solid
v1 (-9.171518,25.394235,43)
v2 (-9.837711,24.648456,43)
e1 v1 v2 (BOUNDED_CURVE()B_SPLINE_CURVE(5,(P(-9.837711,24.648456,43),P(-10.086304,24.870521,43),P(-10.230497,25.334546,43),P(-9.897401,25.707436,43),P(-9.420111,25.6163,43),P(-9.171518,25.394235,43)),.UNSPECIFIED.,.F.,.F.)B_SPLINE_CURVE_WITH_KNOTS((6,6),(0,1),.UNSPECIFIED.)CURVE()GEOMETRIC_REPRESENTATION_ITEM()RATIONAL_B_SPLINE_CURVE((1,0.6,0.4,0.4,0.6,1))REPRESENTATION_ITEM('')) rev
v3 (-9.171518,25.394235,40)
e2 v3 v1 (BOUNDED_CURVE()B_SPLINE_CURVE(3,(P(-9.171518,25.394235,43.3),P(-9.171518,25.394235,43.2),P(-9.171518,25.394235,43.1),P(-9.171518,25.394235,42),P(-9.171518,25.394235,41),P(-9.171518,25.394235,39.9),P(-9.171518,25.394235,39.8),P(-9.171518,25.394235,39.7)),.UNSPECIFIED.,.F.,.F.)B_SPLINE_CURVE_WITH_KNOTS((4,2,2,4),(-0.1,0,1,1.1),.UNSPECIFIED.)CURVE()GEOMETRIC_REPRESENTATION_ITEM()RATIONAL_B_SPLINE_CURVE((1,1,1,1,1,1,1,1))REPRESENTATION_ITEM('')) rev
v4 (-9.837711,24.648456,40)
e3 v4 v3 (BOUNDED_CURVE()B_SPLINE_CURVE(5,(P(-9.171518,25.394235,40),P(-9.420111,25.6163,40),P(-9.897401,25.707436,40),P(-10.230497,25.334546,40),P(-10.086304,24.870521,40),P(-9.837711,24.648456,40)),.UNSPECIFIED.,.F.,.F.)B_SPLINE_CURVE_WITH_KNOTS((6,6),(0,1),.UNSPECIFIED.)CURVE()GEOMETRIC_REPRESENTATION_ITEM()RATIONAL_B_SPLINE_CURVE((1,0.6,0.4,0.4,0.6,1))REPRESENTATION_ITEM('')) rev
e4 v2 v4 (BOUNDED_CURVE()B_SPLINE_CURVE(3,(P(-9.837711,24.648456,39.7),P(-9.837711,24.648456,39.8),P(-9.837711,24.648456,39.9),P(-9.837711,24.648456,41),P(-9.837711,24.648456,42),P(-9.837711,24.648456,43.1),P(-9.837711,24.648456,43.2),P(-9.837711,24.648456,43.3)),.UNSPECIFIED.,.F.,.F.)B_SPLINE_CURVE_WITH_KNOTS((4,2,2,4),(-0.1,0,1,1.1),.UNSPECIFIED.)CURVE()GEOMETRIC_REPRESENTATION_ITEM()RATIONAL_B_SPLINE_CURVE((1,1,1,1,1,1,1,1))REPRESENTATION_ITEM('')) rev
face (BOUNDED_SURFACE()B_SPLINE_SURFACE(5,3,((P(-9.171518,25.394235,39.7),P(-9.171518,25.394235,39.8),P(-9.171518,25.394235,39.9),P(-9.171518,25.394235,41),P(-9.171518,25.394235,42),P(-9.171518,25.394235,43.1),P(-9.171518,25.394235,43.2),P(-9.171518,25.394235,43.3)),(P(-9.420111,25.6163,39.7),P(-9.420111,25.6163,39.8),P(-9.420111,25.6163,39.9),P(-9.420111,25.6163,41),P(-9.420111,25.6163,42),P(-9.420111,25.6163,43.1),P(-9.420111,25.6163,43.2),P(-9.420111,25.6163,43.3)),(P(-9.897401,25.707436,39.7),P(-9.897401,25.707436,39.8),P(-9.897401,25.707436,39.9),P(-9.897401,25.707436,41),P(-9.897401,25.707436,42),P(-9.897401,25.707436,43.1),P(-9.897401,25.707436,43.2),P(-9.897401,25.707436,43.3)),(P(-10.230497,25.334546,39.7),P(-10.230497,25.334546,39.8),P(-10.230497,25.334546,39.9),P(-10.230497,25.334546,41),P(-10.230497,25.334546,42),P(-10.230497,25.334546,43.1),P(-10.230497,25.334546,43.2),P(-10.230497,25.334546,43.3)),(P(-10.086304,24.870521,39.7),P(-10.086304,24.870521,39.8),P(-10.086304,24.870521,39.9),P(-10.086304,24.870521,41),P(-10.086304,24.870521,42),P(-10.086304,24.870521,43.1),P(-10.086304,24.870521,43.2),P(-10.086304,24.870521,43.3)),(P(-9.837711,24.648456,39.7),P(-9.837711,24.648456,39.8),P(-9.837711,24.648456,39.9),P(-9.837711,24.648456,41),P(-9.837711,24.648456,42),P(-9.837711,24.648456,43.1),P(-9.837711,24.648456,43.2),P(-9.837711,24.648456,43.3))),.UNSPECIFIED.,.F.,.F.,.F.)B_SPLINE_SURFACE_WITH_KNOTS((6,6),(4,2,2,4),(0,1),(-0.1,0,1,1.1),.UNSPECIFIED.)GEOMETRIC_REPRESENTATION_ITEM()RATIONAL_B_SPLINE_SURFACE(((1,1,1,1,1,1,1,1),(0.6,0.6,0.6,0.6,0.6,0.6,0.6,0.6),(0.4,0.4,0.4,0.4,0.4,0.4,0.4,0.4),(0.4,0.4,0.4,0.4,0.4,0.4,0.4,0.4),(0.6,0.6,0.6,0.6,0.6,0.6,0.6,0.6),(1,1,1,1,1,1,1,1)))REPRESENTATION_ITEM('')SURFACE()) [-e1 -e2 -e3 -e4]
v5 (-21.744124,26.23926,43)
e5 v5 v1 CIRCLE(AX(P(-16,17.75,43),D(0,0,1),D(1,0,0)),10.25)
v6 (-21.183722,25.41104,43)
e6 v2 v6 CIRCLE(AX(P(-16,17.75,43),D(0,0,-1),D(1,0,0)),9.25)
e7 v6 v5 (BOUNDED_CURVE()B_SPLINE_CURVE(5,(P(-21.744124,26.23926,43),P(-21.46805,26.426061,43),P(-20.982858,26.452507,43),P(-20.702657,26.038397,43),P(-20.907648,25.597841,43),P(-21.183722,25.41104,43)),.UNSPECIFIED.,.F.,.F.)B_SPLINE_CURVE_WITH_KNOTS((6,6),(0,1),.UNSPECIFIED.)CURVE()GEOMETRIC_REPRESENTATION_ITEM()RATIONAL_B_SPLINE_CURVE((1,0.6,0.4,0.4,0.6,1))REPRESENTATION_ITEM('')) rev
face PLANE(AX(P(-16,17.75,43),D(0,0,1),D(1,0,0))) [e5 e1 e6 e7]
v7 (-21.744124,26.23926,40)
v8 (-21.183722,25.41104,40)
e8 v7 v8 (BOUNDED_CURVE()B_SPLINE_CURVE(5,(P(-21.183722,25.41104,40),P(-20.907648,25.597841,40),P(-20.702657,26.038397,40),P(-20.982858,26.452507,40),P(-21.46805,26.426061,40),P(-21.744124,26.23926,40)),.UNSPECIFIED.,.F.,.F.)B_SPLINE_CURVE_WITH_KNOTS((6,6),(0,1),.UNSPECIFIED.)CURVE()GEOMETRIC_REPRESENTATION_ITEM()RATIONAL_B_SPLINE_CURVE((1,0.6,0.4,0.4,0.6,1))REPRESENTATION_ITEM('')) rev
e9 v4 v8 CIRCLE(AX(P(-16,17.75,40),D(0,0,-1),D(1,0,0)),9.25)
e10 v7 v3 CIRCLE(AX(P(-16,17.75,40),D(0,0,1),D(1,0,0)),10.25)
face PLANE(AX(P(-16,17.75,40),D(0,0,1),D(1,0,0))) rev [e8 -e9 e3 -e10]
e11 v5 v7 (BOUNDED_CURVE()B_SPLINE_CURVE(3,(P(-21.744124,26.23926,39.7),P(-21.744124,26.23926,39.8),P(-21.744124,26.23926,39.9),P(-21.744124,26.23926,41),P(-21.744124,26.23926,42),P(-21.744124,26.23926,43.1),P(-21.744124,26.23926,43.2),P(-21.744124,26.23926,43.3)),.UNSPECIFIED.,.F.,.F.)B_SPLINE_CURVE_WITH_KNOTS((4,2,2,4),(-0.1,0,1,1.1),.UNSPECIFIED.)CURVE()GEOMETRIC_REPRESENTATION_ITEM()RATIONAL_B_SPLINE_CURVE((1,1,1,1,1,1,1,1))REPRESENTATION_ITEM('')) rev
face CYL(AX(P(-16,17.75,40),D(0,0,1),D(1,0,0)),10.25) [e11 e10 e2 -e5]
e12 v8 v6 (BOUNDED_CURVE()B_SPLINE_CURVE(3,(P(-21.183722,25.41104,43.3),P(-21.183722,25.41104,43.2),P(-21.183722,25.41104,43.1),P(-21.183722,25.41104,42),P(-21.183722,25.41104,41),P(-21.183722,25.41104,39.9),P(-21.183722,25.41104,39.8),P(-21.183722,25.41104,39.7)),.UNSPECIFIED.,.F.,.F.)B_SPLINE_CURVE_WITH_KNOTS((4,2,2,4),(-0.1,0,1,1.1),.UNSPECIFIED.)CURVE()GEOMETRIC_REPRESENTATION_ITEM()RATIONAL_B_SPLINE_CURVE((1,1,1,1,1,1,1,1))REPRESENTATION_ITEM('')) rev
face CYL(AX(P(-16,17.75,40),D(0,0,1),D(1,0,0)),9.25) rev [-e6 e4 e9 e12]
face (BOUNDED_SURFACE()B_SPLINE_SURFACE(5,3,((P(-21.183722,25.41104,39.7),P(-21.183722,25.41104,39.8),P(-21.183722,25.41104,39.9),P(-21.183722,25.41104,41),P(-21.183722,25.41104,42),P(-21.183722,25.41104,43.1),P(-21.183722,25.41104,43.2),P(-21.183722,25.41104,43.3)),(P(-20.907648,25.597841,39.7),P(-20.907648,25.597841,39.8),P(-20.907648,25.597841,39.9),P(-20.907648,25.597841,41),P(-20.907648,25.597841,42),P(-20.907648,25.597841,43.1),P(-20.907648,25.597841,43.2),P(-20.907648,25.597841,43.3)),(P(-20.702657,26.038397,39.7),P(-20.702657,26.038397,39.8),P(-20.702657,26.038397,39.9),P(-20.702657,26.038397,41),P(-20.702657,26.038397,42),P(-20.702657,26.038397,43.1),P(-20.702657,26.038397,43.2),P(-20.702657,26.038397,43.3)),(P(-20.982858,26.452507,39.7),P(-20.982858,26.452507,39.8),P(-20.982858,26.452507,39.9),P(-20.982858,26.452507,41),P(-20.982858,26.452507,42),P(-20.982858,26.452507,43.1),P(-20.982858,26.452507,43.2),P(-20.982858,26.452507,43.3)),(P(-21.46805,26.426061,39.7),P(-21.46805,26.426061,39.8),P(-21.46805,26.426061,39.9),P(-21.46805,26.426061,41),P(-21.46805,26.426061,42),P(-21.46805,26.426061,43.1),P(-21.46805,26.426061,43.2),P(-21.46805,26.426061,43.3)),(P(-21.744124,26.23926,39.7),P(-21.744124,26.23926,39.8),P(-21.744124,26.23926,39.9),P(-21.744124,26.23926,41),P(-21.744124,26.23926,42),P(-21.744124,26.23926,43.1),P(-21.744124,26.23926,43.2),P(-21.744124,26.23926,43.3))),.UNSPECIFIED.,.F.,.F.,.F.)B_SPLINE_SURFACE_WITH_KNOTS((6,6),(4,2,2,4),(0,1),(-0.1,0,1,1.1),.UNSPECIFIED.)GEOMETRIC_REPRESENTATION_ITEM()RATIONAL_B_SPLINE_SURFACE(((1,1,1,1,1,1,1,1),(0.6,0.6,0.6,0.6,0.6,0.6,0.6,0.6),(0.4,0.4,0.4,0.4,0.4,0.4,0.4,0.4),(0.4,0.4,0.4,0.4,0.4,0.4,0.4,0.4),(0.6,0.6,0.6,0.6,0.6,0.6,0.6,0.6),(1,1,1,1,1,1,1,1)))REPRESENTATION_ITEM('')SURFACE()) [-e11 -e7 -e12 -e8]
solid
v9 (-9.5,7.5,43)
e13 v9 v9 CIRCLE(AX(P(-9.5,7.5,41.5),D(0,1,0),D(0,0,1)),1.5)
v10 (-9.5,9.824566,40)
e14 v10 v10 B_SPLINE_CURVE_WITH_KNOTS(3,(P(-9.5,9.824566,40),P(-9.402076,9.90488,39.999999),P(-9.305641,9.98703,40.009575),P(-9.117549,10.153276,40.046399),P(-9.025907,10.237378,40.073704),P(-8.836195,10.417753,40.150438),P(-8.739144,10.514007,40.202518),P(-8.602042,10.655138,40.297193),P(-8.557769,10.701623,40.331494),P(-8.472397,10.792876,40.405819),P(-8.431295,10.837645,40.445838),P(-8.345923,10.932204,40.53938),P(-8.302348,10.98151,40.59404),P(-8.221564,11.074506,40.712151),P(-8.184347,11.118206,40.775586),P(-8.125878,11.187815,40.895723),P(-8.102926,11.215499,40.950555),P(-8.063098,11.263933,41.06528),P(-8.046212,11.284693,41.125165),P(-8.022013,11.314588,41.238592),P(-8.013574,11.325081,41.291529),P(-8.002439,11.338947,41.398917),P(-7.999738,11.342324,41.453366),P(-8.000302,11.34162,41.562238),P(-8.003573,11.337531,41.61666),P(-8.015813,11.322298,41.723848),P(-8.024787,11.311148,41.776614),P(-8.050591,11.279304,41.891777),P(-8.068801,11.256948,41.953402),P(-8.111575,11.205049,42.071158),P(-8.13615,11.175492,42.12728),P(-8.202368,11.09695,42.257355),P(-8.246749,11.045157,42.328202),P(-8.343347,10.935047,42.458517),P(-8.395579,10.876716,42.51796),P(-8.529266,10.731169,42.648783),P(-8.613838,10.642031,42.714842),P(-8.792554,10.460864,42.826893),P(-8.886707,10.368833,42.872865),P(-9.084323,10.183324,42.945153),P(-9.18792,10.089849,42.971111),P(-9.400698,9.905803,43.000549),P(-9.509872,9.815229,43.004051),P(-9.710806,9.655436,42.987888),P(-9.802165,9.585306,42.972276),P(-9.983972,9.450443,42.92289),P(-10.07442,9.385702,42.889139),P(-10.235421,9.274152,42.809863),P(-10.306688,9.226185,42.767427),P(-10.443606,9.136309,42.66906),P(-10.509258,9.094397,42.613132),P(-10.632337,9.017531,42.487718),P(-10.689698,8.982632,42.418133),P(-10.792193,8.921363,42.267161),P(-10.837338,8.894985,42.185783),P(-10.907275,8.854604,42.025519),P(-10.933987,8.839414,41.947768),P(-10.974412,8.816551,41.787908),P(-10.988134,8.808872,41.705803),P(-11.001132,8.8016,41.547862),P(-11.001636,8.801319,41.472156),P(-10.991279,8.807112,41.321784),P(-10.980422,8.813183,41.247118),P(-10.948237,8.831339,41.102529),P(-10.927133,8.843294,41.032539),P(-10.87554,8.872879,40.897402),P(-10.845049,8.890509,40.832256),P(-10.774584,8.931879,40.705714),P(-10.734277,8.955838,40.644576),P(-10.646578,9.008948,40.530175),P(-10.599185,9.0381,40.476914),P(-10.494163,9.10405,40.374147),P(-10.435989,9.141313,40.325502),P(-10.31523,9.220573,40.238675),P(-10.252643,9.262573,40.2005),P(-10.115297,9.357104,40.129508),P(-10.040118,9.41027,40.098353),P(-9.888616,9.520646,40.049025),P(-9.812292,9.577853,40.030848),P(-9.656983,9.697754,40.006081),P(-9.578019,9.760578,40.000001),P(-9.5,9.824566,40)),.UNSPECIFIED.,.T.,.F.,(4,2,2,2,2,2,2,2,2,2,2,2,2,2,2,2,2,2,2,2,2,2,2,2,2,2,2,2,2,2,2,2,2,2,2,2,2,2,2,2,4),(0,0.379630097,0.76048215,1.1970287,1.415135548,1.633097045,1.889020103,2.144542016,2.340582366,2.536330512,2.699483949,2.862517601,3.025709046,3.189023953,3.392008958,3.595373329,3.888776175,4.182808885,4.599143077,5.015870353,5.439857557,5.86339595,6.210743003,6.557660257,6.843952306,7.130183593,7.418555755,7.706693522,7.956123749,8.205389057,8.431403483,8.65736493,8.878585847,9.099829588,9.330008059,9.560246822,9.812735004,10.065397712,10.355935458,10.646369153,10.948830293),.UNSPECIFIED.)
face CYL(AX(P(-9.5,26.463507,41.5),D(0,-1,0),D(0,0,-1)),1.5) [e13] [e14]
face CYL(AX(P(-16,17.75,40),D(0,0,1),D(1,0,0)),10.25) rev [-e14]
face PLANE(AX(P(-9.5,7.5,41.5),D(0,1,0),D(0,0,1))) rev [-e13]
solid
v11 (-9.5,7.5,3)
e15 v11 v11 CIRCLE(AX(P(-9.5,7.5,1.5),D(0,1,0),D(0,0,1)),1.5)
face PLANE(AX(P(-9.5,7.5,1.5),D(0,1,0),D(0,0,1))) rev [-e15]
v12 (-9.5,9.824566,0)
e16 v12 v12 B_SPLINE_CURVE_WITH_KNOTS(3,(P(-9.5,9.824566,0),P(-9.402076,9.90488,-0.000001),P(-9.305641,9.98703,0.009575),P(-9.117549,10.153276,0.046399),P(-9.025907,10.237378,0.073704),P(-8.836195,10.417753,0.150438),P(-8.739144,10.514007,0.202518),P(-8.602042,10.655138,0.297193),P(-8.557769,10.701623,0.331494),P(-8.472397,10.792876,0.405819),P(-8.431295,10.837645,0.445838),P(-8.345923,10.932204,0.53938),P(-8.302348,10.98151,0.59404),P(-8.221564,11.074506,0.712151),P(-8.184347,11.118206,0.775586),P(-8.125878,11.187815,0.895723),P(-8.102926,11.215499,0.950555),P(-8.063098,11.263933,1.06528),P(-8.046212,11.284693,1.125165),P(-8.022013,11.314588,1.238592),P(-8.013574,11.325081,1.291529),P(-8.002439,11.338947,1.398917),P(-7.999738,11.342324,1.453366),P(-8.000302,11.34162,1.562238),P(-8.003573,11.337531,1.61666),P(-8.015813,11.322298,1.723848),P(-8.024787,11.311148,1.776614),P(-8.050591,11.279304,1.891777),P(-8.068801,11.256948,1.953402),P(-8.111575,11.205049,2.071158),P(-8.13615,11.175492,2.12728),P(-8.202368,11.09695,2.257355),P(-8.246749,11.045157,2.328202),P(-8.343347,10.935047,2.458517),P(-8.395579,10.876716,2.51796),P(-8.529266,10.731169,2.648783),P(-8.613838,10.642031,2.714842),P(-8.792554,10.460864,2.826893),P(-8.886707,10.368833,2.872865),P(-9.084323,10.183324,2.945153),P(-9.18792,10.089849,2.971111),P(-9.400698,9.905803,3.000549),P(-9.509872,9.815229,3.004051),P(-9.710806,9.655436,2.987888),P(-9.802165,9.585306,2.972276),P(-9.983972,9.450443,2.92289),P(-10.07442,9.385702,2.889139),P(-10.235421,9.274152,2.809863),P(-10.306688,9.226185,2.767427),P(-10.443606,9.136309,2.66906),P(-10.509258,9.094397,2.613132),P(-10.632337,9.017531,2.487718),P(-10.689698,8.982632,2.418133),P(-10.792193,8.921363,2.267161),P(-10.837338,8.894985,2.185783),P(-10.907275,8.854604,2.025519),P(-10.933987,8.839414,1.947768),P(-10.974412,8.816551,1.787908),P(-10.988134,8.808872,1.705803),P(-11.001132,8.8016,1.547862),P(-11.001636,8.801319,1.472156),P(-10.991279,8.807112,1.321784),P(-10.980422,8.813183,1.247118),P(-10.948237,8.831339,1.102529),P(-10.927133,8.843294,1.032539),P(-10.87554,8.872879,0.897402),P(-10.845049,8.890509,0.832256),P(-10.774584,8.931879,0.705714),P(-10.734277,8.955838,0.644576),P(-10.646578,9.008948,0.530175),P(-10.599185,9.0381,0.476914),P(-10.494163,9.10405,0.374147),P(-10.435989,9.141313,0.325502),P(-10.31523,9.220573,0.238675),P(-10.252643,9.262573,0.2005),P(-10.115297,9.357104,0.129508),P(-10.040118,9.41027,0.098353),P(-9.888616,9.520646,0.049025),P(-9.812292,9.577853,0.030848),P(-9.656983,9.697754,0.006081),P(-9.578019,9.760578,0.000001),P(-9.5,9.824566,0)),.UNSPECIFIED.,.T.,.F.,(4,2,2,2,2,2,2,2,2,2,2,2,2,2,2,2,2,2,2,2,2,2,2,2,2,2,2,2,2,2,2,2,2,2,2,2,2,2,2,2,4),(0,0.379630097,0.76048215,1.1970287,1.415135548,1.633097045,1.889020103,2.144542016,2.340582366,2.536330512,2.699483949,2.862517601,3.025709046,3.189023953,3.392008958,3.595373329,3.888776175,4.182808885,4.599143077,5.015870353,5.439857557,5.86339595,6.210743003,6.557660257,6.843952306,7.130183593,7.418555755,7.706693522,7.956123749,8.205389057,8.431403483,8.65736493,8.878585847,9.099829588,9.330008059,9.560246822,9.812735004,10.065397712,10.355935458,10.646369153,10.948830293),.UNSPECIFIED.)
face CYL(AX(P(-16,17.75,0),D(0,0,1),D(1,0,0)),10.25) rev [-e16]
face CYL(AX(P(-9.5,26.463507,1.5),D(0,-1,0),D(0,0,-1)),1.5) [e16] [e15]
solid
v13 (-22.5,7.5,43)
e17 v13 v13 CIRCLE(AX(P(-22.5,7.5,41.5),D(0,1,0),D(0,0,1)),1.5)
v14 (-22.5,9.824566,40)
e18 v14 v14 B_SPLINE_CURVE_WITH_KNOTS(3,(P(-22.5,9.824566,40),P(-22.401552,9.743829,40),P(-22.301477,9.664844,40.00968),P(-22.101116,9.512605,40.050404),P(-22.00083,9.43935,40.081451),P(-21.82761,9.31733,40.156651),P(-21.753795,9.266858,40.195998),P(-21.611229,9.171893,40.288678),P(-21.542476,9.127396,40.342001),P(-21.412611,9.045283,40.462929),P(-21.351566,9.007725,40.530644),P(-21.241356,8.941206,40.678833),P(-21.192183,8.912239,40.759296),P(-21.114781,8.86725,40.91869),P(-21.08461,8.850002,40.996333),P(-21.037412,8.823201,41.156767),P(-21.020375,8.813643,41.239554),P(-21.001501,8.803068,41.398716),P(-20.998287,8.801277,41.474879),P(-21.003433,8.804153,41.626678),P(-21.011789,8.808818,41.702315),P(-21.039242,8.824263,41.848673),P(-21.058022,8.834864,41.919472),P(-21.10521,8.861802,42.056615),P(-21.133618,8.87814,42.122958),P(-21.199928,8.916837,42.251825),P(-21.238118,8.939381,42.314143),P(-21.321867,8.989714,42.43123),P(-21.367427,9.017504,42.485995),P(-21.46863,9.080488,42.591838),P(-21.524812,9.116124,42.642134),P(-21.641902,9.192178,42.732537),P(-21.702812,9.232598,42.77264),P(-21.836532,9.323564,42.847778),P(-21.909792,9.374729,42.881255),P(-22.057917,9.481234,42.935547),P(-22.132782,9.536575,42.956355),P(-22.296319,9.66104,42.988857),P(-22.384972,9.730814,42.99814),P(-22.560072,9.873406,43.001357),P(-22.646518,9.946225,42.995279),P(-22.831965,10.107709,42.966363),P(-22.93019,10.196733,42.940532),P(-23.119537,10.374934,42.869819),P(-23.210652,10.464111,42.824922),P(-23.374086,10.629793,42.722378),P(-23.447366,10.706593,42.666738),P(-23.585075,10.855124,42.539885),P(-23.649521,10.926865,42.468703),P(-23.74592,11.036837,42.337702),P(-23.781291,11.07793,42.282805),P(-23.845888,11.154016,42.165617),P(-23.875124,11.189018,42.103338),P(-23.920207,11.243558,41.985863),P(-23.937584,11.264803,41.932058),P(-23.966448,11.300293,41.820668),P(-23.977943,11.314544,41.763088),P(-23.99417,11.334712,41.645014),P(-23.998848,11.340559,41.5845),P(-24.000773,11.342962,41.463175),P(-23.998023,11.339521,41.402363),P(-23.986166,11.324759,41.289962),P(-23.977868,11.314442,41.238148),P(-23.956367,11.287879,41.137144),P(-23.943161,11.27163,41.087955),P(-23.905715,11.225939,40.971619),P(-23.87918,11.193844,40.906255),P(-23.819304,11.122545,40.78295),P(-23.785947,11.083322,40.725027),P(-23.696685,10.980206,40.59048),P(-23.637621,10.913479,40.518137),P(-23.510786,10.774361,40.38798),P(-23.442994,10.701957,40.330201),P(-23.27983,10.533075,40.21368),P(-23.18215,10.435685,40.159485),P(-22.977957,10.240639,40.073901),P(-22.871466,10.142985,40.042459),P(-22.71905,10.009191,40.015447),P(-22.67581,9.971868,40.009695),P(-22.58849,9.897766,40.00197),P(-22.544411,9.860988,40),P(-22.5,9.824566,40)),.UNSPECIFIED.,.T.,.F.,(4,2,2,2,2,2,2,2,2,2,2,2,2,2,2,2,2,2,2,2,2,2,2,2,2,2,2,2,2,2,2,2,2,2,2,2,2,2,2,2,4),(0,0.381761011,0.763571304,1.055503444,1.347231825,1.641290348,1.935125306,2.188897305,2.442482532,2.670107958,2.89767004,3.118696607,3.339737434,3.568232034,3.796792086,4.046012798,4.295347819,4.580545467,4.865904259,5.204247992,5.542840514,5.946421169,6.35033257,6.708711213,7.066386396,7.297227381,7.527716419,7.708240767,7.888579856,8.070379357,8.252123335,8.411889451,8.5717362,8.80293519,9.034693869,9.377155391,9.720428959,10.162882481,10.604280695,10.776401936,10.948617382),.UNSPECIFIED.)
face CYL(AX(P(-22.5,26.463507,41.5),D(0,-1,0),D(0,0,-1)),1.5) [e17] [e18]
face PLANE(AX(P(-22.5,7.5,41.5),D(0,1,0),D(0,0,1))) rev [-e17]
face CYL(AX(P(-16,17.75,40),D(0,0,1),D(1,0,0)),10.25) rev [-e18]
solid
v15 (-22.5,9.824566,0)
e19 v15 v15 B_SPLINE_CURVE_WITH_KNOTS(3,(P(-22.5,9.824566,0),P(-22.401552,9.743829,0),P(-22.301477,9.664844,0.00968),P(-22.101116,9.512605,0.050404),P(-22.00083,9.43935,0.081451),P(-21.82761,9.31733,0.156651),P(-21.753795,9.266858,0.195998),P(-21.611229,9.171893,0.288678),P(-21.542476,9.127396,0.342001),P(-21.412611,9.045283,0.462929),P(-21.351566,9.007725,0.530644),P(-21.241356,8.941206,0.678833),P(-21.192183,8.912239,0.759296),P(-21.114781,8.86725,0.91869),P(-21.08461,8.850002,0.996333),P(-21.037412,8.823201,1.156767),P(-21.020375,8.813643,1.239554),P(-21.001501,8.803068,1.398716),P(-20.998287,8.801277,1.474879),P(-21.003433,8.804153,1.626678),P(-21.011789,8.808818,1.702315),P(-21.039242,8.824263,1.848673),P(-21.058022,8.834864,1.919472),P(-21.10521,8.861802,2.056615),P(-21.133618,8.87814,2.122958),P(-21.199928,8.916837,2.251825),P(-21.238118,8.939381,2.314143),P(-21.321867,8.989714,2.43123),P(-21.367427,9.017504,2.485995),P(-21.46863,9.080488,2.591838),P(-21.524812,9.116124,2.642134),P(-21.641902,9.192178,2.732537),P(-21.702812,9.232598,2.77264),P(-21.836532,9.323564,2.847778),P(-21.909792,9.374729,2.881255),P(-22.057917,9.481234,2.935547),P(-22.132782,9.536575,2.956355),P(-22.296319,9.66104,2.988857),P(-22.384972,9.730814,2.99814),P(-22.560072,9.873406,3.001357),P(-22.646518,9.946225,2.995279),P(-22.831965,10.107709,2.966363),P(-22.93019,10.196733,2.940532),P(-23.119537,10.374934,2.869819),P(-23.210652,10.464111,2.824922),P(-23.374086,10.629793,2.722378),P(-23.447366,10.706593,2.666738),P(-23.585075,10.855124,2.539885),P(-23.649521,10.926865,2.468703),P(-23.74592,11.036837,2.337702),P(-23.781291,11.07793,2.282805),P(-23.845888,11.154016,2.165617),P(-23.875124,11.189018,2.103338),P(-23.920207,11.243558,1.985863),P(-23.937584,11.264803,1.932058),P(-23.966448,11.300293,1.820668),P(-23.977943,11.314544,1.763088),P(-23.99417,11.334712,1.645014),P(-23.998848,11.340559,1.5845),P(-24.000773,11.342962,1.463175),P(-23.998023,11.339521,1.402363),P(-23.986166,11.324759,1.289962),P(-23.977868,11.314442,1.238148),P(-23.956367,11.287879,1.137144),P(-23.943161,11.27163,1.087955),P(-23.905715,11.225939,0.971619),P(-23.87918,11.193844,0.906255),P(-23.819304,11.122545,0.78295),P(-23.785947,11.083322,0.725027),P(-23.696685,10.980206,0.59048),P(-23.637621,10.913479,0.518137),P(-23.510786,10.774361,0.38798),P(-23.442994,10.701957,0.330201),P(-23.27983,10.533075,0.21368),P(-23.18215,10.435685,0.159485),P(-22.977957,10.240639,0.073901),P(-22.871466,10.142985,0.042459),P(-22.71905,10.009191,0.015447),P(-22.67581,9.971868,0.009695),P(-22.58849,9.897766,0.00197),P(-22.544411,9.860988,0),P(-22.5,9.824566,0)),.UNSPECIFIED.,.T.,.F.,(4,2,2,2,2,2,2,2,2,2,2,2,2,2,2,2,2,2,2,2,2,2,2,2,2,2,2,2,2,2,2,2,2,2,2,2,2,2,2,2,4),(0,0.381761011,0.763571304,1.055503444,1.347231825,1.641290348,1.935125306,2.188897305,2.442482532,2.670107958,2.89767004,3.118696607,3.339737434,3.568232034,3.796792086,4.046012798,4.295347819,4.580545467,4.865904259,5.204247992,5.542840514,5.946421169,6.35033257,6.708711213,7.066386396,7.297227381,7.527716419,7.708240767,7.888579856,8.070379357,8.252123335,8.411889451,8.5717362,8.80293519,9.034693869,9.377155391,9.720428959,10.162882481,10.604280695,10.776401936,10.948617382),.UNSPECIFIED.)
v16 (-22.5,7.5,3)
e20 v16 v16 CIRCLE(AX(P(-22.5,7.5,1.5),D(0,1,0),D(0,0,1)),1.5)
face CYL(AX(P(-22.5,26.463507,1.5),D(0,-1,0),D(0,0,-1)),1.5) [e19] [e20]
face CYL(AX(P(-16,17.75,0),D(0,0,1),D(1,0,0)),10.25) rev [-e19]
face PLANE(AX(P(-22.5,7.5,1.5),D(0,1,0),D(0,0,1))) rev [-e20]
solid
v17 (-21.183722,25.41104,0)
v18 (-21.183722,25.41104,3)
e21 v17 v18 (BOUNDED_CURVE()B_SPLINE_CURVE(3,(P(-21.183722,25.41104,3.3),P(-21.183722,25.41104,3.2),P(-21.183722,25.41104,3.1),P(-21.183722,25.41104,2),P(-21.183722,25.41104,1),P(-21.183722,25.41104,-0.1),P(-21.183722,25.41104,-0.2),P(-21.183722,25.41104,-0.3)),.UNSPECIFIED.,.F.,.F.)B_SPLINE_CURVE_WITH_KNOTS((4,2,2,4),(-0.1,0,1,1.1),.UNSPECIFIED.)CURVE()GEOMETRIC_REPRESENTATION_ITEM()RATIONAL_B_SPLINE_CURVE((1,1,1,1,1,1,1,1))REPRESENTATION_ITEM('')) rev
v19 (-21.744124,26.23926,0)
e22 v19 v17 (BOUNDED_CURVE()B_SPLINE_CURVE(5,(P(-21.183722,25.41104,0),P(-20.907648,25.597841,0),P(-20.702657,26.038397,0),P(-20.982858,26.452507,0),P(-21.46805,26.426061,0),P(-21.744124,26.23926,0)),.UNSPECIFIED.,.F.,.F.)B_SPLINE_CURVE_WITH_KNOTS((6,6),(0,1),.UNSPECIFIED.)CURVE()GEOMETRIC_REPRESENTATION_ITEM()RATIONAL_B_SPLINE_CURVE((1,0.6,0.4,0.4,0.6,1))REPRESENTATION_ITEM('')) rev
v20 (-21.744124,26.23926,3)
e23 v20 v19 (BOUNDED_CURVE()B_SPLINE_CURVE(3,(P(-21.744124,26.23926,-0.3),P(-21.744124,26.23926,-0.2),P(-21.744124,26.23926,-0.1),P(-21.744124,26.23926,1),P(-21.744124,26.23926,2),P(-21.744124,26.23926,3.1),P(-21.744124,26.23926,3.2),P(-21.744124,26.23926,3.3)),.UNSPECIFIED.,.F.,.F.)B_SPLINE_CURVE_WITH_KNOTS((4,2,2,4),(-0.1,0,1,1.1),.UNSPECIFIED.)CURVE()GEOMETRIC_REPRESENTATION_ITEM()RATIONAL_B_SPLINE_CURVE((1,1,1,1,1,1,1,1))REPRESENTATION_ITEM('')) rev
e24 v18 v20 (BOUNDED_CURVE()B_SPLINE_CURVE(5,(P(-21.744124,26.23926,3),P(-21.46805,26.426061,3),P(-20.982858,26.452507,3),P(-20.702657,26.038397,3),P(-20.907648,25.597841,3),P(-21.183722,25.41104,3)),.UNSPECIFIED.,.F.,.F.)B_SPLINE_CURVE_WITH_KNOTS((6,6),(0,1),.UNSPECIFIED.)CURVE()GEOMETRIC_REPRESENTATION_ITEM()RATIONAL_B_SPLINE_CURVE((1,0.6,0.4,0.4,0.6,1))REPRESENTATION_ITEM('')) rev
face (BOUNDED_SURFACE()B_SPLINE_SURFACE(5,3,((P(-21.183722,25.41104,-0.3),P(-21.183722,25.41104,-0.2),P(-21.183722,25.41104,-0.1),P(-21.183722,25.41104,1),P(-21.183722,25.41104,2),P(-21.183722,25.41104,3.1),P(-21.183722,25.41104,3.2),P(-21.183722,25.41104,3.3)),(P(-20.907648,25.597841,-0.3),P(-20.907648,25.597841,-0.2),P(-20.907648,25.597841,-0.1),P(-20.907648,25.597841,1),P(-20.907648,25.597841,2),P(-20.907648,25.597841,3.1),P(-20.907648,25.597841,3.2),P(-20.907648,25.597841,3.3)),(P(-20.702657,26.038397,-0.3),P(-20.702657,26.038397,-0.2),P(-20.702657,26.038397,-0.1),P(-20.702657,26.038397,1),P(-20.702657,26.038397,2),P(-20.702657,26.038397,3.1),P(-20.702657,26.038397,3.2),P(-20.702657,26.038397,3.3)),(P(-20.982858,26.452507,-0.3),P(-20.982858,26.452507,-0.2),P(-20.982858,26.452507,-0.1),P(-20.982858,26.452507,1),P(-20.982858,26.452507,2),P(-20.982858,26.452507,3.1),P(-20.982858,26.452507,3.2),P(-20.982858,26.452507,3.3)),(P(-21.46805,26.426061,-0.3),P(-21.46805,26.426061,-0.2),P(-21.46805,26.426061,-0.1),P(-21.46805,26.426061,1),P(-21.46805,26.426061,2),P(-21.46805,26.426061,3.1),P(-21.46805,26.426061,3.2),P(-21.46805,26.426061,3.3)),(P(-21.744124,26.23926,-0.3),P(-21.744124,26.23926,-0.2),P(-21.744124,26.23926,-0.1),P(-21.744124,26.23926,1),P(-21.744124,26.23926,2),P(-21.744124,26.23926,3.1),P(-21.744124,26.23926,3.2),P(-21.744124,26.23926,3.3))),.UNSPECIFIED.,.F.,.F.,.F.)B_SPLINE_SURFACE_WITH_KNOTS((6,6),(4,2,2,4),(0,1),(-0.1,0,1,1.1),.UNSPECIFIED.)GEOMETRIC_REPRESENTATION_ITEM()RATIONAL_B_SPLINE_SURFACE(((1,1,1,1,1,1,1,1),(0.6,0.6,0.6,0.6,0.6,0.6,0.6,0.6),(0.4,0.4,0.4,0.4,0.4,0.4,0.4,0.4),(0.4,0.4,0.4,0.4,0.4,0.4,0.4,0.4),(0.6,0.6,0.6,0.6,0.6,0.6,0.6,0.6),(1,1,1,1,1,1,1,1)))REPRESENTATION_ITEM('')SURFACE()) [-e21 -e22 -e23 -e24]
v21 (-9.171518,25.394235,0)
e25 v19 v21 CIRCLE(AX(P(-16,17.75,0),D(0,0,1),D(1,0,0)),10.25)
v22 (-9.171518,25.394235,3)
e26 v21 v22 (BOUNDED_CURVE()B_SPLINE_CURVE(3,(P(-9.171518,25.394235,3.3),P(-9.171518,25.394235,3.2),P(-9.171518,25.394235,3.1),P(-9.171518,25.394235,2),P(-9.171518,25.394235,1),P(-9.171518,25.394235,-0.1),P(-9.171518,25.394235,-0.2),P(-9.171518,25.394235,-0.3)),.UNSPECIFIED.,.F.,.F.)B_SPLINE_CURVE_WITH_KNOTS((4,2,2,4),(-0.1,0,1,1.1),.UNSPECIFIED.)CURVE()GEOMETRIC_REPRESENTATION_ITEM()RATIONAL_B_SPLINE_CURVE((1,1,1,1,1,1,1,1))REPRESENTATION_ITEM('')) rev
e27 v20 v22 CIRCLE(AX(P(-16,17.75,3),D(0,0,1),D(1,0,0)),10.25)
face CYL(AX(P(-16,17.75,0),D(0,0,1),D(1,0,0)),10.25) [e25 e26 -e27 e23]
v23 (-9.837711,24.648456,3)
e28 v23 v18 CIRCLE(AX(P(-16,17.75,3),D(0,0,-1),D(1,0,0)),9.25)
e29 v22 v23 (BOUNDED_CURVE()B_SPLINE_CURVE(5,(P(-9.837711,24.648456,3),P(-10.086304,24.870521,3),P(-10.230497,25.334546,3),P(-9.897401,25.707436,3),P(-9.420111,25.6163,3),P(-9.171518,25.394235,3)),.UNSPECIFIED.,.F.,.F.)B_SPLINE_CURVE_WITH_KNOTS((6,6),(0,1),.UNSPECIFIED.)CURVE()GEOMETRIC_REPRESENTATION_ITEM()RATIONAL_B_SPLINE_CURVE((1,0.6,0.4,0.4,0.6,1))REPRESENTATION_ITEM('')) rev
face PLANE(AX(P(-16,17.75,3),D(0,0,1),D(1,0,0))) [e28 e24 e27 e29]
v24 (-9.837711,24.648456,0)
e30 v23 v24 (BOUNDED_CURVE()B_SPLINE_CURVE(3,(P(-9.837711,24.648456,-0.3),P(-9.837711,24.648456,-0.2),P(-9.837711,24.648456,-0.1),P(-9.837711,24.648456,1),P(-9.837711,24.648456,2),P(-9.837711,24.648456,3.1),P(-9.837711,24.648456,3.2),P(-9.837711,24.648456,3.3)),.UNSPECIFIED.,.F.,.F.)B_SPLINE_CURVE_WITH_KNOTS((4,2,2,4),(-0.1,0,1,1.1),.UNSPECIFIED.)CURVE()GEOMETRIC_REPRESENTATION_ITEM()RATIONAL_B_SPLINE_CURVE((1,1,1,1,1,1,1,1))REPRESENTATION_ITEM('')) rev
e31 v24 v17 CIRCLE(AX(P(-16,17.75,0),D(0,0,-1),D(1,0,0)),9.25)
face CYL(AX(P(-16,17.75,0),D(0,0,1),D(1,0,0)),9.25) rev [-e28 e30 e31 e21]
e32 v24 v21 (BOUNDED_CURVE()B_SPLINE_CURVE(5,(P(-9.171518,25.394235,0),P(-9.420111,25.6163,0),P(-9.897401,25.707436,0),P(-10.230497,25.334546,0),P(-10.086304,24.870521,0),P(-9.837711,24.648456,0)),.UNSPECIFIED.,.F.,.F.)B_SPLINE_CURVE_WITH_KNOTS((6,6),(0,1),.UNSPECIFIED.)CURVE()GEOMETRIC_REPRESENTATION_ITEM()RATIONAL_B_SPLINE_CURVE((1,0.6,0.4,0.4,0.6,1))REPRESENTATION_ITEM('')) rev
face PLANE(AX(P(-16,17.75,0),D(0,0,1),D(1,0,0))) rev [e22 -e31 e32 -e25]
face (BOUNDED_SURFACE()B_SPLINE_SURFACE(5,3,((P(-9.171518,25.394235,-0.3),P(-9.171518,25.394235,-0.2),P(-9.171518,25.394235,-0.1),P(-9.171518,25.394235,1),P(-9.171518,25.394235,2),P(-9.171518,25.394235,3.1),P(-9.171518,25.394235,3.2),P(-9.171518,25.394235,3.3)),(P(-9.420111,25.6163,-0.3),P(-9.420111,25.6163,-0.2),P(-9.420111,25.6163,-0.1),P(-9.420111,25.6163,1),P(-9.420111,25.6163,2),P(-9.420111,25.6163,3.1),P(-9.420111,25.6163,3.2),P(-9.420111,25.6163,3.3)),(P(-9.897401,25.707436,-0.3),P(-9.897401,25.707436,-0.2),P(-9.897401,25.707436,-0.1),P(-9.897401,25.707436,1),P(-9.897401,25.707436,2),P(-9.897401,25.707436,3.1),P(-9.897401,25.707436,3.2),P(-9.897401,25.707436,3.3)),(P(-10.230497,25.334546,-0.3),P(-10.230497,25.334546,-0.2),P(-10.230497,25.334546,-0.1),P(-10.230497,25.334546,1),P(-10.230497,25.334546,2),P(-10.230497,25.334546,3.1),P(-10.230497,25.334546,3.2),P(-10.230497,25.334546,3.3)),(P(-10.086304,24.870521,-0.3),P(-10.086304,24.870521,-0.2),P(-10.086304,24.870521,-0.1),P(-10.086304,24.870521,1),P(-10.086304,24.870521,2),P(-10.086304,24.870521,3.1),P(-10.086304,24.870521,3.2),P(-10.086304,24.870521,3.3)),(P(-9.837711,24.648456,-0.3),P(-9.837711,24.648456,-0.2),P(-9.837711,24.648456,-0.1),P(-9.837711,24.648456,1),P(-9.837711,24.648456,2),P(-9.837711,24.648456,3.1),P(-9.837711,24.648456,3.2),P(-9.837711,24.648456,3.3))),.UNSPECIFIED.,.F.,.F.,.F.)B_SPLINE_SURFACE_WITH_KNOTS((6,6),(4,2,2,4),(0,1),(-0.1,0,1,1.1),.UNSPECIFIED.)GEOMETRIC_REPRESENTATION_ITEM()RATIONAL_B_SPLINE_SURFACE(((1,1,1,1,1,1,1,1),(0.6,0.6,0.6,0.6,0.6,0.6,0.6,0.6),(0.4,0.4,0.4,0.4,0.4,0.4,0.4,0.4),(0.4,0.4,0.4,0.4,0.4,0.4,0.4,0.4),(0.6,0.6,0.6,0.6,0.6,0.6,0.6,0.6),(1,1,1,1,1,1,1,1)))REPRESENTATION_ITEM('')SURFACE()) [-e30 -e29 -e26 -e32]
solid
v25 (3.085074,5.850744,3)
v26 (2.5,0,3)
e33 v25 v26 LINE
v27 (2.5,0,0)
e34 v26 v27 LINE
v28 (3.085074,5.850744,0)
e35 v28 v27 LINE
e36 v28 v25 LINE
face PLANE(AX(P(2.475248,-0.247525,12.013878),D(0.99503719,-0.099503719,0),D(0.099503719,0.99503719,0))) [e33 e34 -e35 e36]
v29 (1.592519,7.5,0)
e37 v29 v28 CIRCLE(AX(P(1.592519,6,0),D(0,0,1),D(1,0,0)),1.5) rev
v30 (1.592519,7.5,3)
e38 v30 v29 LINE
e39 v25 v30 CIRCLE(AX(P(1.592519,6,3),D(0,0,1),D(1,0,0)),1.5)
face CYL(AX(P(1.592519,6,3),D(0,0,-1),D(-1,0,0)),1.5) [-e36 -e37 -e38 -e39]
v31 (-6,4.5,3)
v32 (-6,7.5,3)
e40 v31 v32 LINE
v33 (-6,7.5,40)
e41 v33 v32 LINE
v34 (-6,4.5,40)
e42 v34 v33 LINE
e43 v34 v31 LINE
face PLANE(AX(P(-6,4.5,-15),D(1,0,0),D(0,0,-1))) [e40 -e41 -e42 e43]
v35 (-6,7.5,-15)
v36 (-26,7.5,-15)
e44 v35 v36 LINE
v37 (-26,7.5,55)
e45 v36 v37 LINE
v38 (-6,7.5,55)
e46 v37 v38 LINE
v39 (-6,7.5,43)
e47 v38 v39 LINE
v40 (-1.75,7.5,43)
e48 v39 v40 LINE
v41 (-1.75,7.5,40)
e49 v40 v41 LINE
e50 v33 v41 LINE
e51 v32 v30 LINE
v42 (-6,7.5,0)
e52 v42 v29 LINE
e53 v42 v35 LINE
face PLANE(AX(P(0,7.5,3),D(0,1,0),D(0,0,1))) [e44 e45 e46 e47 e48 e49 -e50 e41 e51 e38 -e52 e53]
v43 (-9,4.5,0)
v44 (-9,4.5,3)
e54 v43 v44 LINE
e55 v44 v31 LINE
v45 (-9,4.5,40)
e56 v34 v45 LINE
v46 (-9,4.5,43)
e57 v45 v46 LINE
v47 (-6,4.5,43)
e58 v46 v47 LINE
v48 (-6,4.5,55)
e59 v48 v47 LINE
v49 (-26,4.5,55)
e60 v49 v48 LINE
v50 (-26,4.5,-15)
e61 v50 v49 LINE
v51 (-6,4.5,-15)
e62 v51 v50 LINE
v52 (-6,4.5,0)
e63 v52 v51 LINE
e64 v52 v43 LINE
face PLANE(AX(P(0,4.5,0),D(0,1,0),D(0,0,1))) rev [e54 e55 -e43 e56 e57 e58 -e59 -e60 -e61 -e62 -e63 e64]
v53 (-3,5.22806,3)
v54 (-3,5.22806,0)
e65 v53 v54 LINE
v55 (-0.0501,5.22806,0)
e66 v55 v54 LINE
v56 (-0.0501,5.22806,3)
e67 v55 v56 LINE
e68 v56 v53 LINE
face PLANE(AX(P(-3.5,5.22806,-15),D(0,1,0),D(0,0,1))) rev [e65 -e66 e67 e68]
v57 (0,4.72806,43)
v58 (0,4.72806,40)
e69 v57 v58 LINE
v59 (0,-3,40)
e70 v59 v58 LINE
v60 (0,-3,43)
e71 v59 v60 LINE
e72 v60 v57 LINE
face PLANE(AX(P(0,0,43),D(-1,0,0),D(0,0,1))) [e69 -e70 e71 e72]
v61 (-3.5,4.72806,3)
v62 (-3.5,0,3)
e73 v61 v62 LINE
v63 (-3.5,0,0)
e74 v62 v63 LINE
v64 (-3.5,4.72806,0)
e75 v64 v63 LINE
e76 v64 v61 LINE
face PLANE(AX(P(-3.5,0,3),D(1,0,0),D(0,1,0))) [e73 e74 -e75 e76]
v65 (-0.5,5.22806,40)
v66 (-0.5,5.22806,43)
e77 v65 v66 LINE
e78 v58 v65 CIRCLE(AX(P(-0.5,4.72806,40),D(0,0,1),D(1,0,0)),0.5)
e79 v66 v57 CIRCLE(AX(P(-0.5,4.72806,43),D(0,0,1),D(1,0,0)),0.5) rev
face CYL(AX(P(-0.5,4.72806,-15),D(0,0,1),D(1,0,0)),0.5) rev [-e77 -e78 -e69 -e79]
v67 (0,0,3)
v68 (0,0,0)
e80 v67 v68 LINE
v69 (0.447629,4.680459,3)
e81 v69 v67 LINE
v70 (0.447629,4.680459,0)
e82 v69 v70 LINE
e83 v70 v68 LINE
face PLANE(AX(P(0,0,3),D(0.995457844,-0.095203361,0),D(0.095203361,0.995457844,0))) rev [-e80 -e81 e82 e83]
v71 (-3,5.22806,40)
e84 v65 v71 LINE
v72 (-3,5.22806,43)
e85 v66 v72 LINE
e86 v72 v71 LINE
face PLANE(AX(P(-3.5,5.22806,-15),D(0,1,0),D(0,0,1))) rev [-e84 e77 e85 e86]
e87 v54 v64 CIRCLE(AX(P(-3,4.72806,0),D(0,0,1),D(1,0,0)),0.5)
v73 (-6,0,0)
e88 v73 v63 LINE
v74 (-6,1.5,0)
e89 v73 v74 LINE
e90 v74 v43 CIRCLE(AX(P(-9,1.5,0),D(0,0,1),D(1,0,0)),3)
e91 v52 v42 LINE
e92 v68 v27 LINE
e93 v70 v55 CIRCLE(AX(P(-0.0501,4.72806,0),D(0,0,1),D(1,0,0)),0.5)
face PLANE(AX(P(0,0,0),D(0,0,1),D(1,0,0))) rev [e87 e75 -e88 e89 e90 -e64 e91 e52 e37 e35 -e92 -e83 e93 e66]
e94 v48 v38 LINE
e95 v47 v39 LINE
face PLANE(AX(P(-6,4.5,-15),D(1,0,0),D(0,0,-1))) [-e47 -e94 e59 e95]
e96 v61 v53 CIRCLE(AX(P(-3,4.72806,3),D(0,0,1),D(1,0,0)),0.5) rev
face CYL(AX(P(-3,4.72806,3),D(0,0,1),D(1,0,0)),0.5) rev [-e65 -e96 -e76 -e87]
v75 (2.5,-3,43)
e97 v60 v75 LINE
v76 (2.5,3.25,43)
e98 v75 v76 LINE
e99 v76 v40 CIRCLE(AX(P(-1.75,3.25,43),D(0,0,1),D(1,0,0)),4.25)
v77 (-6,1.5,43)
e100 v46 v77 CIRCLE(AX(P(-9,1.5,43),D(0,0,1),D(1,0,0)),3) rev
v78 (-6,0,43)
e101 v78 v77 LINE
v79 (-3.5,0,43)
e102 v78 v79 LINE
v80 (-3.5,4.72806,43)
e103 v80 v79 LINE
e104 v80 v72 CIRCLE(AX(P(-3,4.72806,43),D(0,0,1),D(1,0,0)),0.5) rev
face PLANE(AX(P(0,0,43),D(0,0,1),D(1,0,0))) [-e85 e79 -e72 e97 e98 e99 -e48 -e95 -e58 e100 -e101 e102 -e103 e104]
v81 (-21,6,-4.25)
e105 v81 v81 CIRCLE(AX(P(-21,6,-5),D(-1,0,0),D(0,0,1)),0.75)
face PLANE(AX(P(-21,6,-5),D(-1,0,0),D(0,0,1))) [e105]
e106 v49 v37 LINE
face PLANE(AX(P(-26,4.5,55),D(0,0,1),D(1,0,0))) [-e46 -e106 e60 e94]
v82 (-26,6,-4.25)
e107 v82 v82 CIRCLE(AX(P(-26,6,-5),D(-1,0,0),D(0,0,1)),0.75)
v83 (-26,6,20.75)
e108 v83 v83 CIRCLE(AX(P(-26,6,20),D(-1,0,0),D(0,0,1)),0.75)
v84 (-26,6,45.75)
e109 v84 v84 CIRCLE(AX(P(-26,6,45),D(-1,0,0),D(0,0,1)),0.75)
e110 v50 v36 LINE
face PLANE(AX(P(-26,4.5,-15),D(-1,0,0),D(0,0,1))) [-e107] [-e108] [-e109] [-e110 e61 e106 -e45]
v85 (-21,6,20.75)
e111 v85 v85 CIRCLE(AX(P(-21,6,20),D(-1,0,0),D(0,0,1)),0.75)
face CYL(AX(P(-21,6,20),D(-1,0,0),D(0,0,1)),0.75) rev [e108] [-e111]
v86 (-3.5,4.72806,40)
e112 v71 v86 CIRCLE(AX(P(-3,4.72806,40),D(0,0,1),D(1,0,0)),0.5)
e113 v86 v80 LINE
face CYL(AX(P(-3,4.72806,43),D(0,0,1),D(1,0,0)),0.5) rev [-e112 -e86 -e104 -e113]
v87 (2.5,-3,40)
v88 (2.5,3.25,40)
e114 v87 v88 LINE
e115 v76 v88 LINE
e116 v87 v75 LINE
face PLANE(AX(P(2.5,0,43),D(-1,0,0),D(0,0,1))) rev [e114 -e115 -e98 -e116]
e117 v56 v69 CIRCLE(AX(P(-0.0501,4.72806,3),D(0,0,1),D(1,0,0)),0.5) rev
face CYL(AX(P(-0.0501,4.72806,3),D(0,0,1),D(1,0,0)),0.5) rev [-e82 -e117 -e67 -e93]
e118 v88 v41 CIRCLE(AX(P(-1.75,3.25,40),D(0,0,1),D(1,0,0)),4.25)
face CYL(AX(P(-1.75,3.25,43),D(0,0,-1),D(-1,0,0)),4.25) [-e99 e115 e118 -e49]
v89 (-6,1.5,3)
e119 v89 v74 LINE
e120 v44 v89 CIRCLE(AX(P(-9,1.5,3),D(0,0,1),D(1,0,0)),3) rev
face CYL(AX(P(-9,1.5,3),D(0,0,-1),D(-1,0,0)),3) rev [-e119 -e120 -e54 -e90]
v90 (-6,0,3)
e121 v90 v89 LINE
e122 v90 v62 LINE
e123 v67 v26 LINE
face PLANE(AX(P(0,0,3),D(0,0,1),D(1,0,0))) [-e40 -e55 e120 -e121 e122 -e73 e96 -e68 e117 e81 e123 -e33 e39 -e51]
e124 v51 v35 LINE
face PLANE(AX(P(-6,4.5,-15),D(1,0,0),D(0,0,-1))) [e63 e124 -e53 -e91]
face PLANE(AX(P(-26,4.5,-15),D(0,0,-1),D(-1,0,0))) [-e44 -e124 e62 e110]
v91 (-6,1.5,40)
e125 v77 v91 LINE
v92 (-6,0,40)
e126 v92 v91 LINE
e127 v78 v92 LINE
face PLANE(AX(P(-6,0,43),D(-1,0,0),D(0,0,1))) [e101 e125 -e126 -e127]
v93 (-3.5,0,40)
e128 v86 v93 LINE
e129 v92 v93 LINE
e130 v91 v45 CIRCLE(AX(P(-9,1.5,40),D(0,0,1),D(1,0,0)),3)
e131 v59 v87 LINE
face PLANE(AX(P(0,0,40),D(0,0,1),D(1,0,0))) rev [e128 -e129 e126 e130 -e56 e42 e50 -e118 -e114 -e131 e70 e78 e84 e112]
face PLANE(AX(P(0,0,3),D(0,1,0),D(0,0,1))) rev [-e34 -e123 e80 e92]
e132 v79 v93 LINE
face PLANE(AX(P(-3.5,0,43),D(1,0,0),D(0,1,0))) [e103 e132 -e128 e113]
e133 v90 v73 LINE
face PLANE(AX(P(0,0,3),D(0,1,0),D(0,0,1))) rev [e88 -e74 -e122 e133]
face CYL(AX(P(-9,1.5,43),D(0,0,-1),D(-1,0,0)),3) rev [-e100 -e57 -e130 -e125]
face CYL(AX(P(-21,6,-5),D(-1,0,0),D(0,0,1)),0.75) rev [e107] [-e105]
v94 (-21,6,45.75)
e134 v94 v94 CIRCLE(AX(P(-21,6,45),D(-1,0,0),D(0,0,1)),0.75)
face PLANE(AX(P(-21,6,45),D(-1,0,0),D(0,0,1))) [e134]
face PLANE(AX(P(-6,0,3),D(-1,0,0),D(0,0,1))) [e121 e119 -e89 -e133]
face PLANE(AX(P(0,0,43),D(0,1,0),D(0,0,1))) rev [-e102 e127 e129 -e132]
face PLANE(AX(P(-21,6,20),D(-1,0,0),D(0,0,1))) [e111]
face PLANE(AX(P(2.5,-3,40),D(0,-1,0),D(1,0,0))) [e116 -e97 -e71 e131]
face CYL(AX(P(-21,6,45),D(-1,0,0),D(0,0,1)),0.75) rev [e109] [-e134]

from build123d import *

# Parameters (mm, degrees)
BOSS_EXTRUDE1_DEPTH      = 3
LPATTERN1_COUNT          = 2
LPATTERN1_PITCH          = 40
SKETCH2_W                = 20
SKETCH2_H                = 70
BOSS_EXTRUDE2_DEPTH      = 3
FILLET1_R                = 3
BOSS_EXTRUDE3_DEPTH      = 3
FILLET2_START            = -1
FILLET2_DEPTH            = 5
FILLET3_DEPTH            = 3
BOSS_EXTRUDE5_REACH      = 65.784
BOSS_EXTRUDE5_END_RADIUS = 10.25
SKETCH5_R                = 1.5
LPATTERN2_START          = 40
LPATTERN2_DEPTH          = 3
LPATTERN2_START_2        = 7.5
LPATTERN2_2_OUTLINE_R    = 1.5
LPATTERN2_2_DEPTH        = 1.302234895
LPATTERN2_START_3        = 8.802234895
LPATTERN2_3_OUTLINE_R    = 1.5
LPATTERN2_3_DEPTH        = 2.539759791
LPATTERN2_START_4        = 39
LPATTERN2_4_DEPTH        = 5
LPATTERN2_5_OUTLINE_R    = 1.5
LPATTERN2_5_DEPTH        = 1.302235223
LPATTERN2_START_5        = 8.802235223
LPATTERN2_6_OUTLINE_R    = 1.5
LPATTERN2_6_DEPTH        = 2.539761855
LPATTERN2_7_OUTLINE_W    = 10.25
LPATTERN2_7_OUTLINE_H    = 3.000220265
LPATTERN2_7_ANGLE        = 22.115218
CUT_EXTRUDE2_DEPTH       = 64.922422006
CUT_EXTRUDE2_DEPTH_BACK  = 64.922422006
SKETCH6_W                = 3.5
SKETCH6_H                = 1.978060381
FILLET4_R                = 0.5
SKETCH7_W                = 2.5
SKETCH7_H                = 3
BOSS_EXTRUDE6_DEPTH      = 3
SKETCH8_R                = 0.75
CUT_EXTRUDE3_DEPTH       = 5
CUT_EXTRUDE4_START       = -3
CUT_EXTRUDE4_DEPTH       = 3
BOSS_EXTRUDE7_DEPTH      = 3
FILLET5_R                = 0.5
FILLET6_R                = 1.5


with BuildPart() as part:
    # Sketch1 → Boss-Extrude1 (new body)
    with BuildSketch(Plane.XY):
        with BuildLine():
            Line((0, 3.25), (0, 0))
            Line((0, 0), (2.5, 0))
            Line((2.5, 0), (2.5, 3.25))
            ThreePointArc((2.5, 3.25), (1.25520382, 6.25520382), (-1.75, 7.5))
            Line((-1.75, 7.5), (-6, 7.5))
            Line((-6, 7.5), (-6, 3.25))
            Line((-6, 3.25), (-6, 0))
            Line((-6, 0), (-3.5, 0))
            Line((-3.5, 0), (-3.5, 3.25))
            ThreePointArc((-3.5, 3.25), (-1.75, 5), (0, 3.25))
        make_face()
    extrude(amount=BOSS_EXTRUDE1_DEPTH)


with BuildPart() as lpattern1_1:
    # LPattern1: pattern copy
    add(part.part.moved(Location(Vector(0, 0, 1) * (1 * LPATTERN1_PITCH))))


with BuildPart() as part_1:
    add(part.part)

    add(lpattern1_1.part)  # Boss-Extrude2 merges LPattern1_1
    # Sketch2 → Boss-Extrude2 (add)
    with BuildSketch(Plane(origin=(0, 7.5, 0), x_dir=(1, 0, 0), z_dir=(0, 1, 0))):
        with Locations((-16, -20)):
            Rectangle(SKETCH2_W, SKETCH2_H)
    extrude(amount=-BOSS_EXTRUDE2_DEPTH)

    # Fillet1
    fillet1_edges = [part_1.edges().sort_by_distance(p)[0] for p in [
        (-6, 4.5, 1.5),
        (-6, 4.5, 41.5),
    ]]
    fillet(fillet1_edges, radius=FILLET1_R)

    # Sketch6 → Cut-Extrude2 (cut, two sides: drawn at the far end of the back side and taken through both)
    with BuildSketch(Plane.XY.offset(3).offset(-CUT_EXTRUDE2_DEPTH_BACK)):
        with Locations((-1.75, 4.239030191)):
            Rectangle(SKETCH6_W, SKETCH6_H)
    extrude(amount=CUT_EXTRUDE2_DEPTH + CUT_EXTRUDE2_DEPTH_BACK, mode=Mode.SUBTRACT)

    # Fillet4
    fillet4_edges = [part_1.edges().sort_by_distance(p)[0] for p in [
        (-3.5, 5.228060381, 1.5),
        (-3.5, 5.228060381, 41.5),
        (0, 5.228060381, 1.5),
        (0, 5.228060381, 41.5),
    ]]
    fillet(fillet4_edges, radius=FILLET4_R)

    # Sketch7 → Boss-Extrude6 (add)
    with BuildSketch(Plane.XY.offset(43)):
        with Locations((1.25, -1.5)):
            Rectangle(SKETCH7_W, SKETCH7_H)
    extrude(amount=-BOSS_EXTRUDE6_DEPTH)

    # Sketch8 → Cut-Extrude3 (cut)
    with BuildSketch(Plane.ZY.offset(26)):
        with Locations((-5, 6)):
            Circle(SKETCH8_R)
        with Locations((20, 6)):
            Circle(SKETCH8_R)
        with Locations((45, 6)):
            Circle(SKETCH8_R)
    extrude(amount=-CUT_EXTRUDE3_DEPTH, mode=Mode.SUBTRACT)

    # Sketch9 → Cut-Extrude4 (cut)
    with BuildSketch(Plane(origin=(0, 0, 0), x_dir=(-1, 0, 0), z_dir=(0, 0, -1)).offset(CUT_EXTRUDE4_START)):
        with BuildLine():
            Line((0, 0), (0.5, 5.228060381))
            ThreePointArc((0.5, 5.228060381), (0.146446609, 5.081613772), (0, 4.728060381))
            Line((0, 4.728060381), (0, 0))
        make_face()
        with BuildLine():
            Line((0.5, 5.228060381), (-0.5, 5.228060381))
            Line((-0.5, 5.228060381), (0, 0))
            Line((0, 0), (0, 4.728060381))
            ThreePointArc((0, 4.728060381), (0.146446609, 5.081613772), (0.5, 5.228060381))
        make_face()
    extrude(amount=CUT_EXTRUDE4_DEPTH, mode=Mode.SUBTRACT)

    # Sketch9<3> → Boss-Extrude7 (add)
    with BuildSketch(Plane(origin=(0, 0, 0), x_dir=(-1, 0, 0), z_dir=(0, 0, -1))):
        with BuildLine():
            Line((1.75, 7.5), (-3.25, 7.5))
            Line((-3.25, 7.5), (-2.5, 0))
            Line((-2.5, 0), (-2.5, 3.25))
            ThreePointArc((-2.5, 3.25), (-1.25520382, 6.25520382), (1.75, 7.5))
        make_face()
    extrude(amount=-BOSS_EXTRUDE7_DEPTH)

    # Fillet5
    fillet5_edges = [part_1.edges().sort_by_distance(p)[0] for p in [
        (0.5, 5.228060381, 1.5),
    ]]
    fillet(fillet5_edges, radius=FILLET5_R)

    # Fillet6
    fillet6_edges = [part_1.edges().sort_by_distance(p)[0] for p in [
        (3.25, 7.5, 1.5),
    ]]
    fillet(fillet6_edges, radius=FILLET6_R)


with BuildPart() as body_2:
    # Sketch4 → Boss-Extrude3 (new body)
    with BuildSketch(Plane.XY.offset(3)):
        with BuildLine():
            Line((-20.857798696, 25.621740076), (-21.206324936, 26.579308051))
            ThreePointArc((-21.206324936, 26.579308051), (-16.672163531, 7.522062955), (-9.682947675, 25.822010278))
            Line((-9.682947675, 25.822010278), (-10.11803023, 24.888972729))
            ThreePointArc((-10.11803023, 24.888972729), (-16.629657521, 8.521455618), (-20.857798696, 25.621740076))
        make_face()
    extrude(amount=-BOSS_EXTRUDE3_DEPTH)

    # Fillet2: read off the stored shape, not the designer's step
    # Fillet2 outline → Fillet2 (cut)
    with BuildSketch(Plane.XY.offset(FILLET2_START)):
        with BuildLine():
            add(Edge.make_bspline(
                [(-20.994076432, 25.996160077), (-21.074153595, 26.216170321), (-21.251523965, 26.350710286), (-21.454646821, 26.373043505), (-21.624101617, 26.320471493), (-21.744123922, 26.239260296)],
                knots=[0.438237279, 0.438237279, 0.438237279, 0.438237279, 0.438237279, 0.438237279, 1, 1, 1, 1, 1, 1], degree=5, weights=[0.507629267, 0.479872472, 0.515231147, 0.613705294, 0.775294911, 1]))
            Line((-20.994076432, 25.996160077), (-21.206324936, 26.579308051))
            ThreePointArc((-21.206324936, 26.579308051), (-21.477863695, 26.413458278), (-21.744123922, 26.239260296))
        make_face()
        with BuildLine():
            add(Edge.make_bspline(
                [(-21.183721588, 25.411039779), (-21.095700521, 25.470597844), (-21.011417818, 25.561339411), (-20.949957611, 25.687250869), (-20.937439038, 25.840550084), (-20.994076432, 25.996160077)],
                knots=[0, 0, 0, 0, 0, 0, 0.438237279, 0.438237279, 0.438237279, 0.438237279, 0.438237279, 0.438237279], degree=5, weights=[1, 0.824705088, 0.687820559, 0.589346413, 0.529282649, 0.507629267]))
            ThreePointArc((-21.183721588, 25.411039779), (-21.021865296, 25.518099442), (-20.857798696, 25.621740076))
            Line((-20.857798696, 25.621740076), (-20.994076432, 25.996160077))
        make_face()
    extrude(amount=FILLET2_DEPTH, mode=Mode.SUBTRACT)

    # Fillet3: read off the stored shape, not the designer's step
    # Fillet3 outline → Fillet3 (cut)
    with BuildSketch(Plane.XY):
        with BuildLine():
            add(Edge.make_bspline(
                [(-9.171518011, 25.394235327), (-9.282578146, 25.493443697), (-9.44922289, 25.569577268), (-9.660410728, 25.570842005), (-9.856114015, 25.450653826), (-9.957768573, 25.23265496)],
                knots=[0, 0, 0, 0, 0, 0, 0.573717386, 0.573717386, 0.573717386, 0.573717386, 0.573717386, 0.573717386], degree=5, weights=[1, 0.770513046, 0.606856419, 0.50903012, 0.477034149, 0.510868506]))
            ThreePointArc((-9.171518011, 25.394235327), (-9.423753658, 25.612282369), (-9.682947675, 25.822010278))
            Line((-9.682947675, 25.822010278), (-9.957768573, 25.23265496))
        make_face()
        with BuildLine():
            add(Edge.make_bspline(
                [(-9.957768573, 25.23265496), (-10.024989519, 25.088499201), (-10.028130695, 24.940896848), (-9.983698166, 24.813907164), (-9.914364214, 24.716929113), (-9.837711376, 24.648456271)],
                knots=[0.573717386, 0.573717386, 0.573717386, 0.573717386, 0.573717386, 0.573717386, 1, 1, 1, 1, 1, 1], degree=5, weights=[0.510868506, 0.536008058, 0.597490983, 0.695317282, 0.829486954, 1]))
            Line((-9.957768573, 25.23265496), (-10.11803023, 24.888972729))
            ThreePointArc((-10.11803023, 24.888972729), (-9.976670181, 24.770113809), (-9.837711376, 24.648456271))
        make_face()
    extrude(amount=FILLET3_DEPTH, mode=Mode.SUBTRACT)


with BuildPart() as body_3:
    # Boss-Extrude5: up to this cylinder (the profile starts outside it)
    boss_extrude5_end = Plane(origin=(-16, 17.75, 1.5), z_dir=(0, 0, 1)) * Cylinder(BOSS_EXTRUDE5_END_RADIUS, 153.068, mode=Mode.PRIVATE)
    # Sketch5 → Boss-Extrude5 (new, up to the surface)
    with BuildSketch(Plane(origin=(0, 7.5, 0), x_dir=(1, 0, 0), z_dir=(0, 1, 0)), mode=Mode.PRIVATE) as boss_extrude5_sk1:
        with Locations(Location((-22.5, -1.5, 0), (0, 0, 90))):
            Circle(SKETCH5_R)
    boss_extrude5_tool1 = extrude(boss_extrude5_sk1.sketch, amount=BOSS_EXTRUDE5_REACH, mode=Mode.PRIVATE) - boss_extrude5_end
    add(boss_extrude5_tool1.solids().sort_by_distance((-22.5, 7.5, 1.5))[0])
    # Sketch5 → Boss-Extrude5 (new, up to the surface)
    with BuildSketch(Plane(origin=(0, 7.5, 0), x_dir=(1, 0, 0), z_dir=(0, 1, 0)), mode=Mode.PRIVATE) as boss_extrude5_sk2:
        with Locations(Location((-9.5, -1.5, 0), (0, 0, 90))):
            Circle(SKETCH5_R)
    boss_extrude5_tool2 = extrude(boss_extrude5_sk2.sketch, amount=BOSS_EXTRUDE5_REACH, mode=Mode.PRIVATE) - boss_extrude5_end
    add(boss_extrude5_tool2.solids().sort_by_distance((-9.5, 7.5, 1.5))[0])


with BuildPart() as body_4:
    # LPattern2: read off the stored shape, not the designer's step
    # LPattern2 outline → LPattern2 (new body)
    with BuildSketch(Plane.XY.offset(LPATTERN2_START)):
        with BuildLine():
            ThreePointArc((-21.744123922, 26.239260296), (-16.687368099, 7.523073526), (-9.171518011, 25.394235327))
            add(Edge.make_bspline(
                [(-9.171518011, 25.394235327), (-9.42011103, 25.616299782), (-9.897400645, 25.707435586), (-10.230497327, 25.334546058), (-10.086304395, 24.870520725), (-9.837711376, 24.648456271)],
                knots=[0, 0, 0, 0, 0, 0, 1, 1, 1, 1, 1, 1], degree=5, weights=[1, 0.6, 0.4, 0.4, 0.6, 1]))
            ThreePointArc((-9.837711376, 24.648456271), (-16.620307797, 8.520822451), (-21.183721588, 25.41103978))
            add(Edge.make_bspline(
                [(-21.183721588, 25.41103978), (-20.907648082, 25.597840557), (-20.702656783, 26.038396659), (-20.98285795, 26.452506918), (-21.468050416, 26.426061074), (-21.744123922, 26.239260296)],
                knots=[0, 0, 0, 0, 0, 0, 1, 1, 1, 1, 1, 1], degree=5, weights=[1, 0.6, 0.4, 0.4, 0.6, 1]))
        make_face()
    extrude(amount=LPATTERN2_DEPTH)


with BuildPart() as body_5:
    # LPattern2 2 outline → LPattern2 2 (new body)
    with BuildSketch(Plane(origin=(0, 0, 0), x_dir=(1, 0, 0), z_dir=(0, 1, 0)).offset(LPATTERN2_START_2)):
        with Locations((-22.5, -41.5)):
            Circle(LPATTERN2_2_OUTLINE_R)
    extrude(amount=LPATTERN2_2_DEPTH)

    # LPattern2 3 outline → LPattern2 3 (add)
    with BuildSketch(Plane(origin=(0, 0, 0), x_dir=(1, 0, 0), z_dir=(0, 1, 0)).offset(LPATTERN2_START_3)):
        with Locations((-22.5, -41.5)):
            Circle(LPATTERN2_3_OUTLINE_R)
    extrude(amount=LPATTERN2_3_DEPTH)

    # LPattern2 4 outline → LPattern2 4 (cut)
    with BuildSketch(Plane.XY.offset(LPATTERN2_START_4)):
        with BuildLine():
            Line((-20, 11.341994686), (-23.999998778, 11.341995665))
            ThreePointArc((-23.999998778, 11.341995665), (-22.622702211, 9.926809128), (-20.999584885, 8.802002963))
            Line((-20.999584885, 8.802002963), (-20, 8.243497024))
            Line((-20, 8.243497024), (-20, 11.341994686))
        make_face()
    extrude(amount=LPATTERN2_4_DEPTH, mode=Mode.SUBTRACT)


with BuildPart() as body_6:
    # LPattern2 5 outline → LPattern2 5 (new body)
    with BuildSketch(Plane(origin=(0, 0, 0), x_dir=(1, 0, 0), z_dir=(0, 1, 0)).offset(LPATTERN2_START_2)):
        with Locations((-9.5, -41.5)):
            Circle(LPATTERN2_5_OUTLINE_R)
    extrude(amount=LPATTERN2_5_DEPTH)

    # LPattern2 6 outline → LPattern2 6 (add)
    with BuildSketch(Plane(origin=(0, 0, 0), x_dir=(1, 0, 0), z_dir=(0, 1, 0)).offset(LPATTERN2_START_5)):
        with Locations((-9.5, -41.5)):
            Circle(LPATTERN2_6_OUTLINE_R)
    extrude(amount=LPATTERN2_6_DEPTH)

    # LPattern2 7 outline → LPattern2 7 (revolve, cut)
    with BuildSketch(Plane(origin=(-16, 17.75, 0), x_dir=(0.4877650283417417, -0.8729749579035929, 0), z_dir=(-0.8729749579035929, -0.4877650283417417, 0))):
        with Locations((5.125, 41.500109978)):
            Rectangle(LPATTERN2_7_OUTLINE_W, LPATTERN2_7_OUTLINE_H)
    revolve(axis=Axis((-16, 17.75, 0), (0, 0, 1)), revolution_arc=LPATTERN2_7_ANGLE, mode=Mode.SUBTRACT)


solid = Compound([part_1.part, body_2.part, body_3.part, body_4.part, body_5.part, body_6.part])
